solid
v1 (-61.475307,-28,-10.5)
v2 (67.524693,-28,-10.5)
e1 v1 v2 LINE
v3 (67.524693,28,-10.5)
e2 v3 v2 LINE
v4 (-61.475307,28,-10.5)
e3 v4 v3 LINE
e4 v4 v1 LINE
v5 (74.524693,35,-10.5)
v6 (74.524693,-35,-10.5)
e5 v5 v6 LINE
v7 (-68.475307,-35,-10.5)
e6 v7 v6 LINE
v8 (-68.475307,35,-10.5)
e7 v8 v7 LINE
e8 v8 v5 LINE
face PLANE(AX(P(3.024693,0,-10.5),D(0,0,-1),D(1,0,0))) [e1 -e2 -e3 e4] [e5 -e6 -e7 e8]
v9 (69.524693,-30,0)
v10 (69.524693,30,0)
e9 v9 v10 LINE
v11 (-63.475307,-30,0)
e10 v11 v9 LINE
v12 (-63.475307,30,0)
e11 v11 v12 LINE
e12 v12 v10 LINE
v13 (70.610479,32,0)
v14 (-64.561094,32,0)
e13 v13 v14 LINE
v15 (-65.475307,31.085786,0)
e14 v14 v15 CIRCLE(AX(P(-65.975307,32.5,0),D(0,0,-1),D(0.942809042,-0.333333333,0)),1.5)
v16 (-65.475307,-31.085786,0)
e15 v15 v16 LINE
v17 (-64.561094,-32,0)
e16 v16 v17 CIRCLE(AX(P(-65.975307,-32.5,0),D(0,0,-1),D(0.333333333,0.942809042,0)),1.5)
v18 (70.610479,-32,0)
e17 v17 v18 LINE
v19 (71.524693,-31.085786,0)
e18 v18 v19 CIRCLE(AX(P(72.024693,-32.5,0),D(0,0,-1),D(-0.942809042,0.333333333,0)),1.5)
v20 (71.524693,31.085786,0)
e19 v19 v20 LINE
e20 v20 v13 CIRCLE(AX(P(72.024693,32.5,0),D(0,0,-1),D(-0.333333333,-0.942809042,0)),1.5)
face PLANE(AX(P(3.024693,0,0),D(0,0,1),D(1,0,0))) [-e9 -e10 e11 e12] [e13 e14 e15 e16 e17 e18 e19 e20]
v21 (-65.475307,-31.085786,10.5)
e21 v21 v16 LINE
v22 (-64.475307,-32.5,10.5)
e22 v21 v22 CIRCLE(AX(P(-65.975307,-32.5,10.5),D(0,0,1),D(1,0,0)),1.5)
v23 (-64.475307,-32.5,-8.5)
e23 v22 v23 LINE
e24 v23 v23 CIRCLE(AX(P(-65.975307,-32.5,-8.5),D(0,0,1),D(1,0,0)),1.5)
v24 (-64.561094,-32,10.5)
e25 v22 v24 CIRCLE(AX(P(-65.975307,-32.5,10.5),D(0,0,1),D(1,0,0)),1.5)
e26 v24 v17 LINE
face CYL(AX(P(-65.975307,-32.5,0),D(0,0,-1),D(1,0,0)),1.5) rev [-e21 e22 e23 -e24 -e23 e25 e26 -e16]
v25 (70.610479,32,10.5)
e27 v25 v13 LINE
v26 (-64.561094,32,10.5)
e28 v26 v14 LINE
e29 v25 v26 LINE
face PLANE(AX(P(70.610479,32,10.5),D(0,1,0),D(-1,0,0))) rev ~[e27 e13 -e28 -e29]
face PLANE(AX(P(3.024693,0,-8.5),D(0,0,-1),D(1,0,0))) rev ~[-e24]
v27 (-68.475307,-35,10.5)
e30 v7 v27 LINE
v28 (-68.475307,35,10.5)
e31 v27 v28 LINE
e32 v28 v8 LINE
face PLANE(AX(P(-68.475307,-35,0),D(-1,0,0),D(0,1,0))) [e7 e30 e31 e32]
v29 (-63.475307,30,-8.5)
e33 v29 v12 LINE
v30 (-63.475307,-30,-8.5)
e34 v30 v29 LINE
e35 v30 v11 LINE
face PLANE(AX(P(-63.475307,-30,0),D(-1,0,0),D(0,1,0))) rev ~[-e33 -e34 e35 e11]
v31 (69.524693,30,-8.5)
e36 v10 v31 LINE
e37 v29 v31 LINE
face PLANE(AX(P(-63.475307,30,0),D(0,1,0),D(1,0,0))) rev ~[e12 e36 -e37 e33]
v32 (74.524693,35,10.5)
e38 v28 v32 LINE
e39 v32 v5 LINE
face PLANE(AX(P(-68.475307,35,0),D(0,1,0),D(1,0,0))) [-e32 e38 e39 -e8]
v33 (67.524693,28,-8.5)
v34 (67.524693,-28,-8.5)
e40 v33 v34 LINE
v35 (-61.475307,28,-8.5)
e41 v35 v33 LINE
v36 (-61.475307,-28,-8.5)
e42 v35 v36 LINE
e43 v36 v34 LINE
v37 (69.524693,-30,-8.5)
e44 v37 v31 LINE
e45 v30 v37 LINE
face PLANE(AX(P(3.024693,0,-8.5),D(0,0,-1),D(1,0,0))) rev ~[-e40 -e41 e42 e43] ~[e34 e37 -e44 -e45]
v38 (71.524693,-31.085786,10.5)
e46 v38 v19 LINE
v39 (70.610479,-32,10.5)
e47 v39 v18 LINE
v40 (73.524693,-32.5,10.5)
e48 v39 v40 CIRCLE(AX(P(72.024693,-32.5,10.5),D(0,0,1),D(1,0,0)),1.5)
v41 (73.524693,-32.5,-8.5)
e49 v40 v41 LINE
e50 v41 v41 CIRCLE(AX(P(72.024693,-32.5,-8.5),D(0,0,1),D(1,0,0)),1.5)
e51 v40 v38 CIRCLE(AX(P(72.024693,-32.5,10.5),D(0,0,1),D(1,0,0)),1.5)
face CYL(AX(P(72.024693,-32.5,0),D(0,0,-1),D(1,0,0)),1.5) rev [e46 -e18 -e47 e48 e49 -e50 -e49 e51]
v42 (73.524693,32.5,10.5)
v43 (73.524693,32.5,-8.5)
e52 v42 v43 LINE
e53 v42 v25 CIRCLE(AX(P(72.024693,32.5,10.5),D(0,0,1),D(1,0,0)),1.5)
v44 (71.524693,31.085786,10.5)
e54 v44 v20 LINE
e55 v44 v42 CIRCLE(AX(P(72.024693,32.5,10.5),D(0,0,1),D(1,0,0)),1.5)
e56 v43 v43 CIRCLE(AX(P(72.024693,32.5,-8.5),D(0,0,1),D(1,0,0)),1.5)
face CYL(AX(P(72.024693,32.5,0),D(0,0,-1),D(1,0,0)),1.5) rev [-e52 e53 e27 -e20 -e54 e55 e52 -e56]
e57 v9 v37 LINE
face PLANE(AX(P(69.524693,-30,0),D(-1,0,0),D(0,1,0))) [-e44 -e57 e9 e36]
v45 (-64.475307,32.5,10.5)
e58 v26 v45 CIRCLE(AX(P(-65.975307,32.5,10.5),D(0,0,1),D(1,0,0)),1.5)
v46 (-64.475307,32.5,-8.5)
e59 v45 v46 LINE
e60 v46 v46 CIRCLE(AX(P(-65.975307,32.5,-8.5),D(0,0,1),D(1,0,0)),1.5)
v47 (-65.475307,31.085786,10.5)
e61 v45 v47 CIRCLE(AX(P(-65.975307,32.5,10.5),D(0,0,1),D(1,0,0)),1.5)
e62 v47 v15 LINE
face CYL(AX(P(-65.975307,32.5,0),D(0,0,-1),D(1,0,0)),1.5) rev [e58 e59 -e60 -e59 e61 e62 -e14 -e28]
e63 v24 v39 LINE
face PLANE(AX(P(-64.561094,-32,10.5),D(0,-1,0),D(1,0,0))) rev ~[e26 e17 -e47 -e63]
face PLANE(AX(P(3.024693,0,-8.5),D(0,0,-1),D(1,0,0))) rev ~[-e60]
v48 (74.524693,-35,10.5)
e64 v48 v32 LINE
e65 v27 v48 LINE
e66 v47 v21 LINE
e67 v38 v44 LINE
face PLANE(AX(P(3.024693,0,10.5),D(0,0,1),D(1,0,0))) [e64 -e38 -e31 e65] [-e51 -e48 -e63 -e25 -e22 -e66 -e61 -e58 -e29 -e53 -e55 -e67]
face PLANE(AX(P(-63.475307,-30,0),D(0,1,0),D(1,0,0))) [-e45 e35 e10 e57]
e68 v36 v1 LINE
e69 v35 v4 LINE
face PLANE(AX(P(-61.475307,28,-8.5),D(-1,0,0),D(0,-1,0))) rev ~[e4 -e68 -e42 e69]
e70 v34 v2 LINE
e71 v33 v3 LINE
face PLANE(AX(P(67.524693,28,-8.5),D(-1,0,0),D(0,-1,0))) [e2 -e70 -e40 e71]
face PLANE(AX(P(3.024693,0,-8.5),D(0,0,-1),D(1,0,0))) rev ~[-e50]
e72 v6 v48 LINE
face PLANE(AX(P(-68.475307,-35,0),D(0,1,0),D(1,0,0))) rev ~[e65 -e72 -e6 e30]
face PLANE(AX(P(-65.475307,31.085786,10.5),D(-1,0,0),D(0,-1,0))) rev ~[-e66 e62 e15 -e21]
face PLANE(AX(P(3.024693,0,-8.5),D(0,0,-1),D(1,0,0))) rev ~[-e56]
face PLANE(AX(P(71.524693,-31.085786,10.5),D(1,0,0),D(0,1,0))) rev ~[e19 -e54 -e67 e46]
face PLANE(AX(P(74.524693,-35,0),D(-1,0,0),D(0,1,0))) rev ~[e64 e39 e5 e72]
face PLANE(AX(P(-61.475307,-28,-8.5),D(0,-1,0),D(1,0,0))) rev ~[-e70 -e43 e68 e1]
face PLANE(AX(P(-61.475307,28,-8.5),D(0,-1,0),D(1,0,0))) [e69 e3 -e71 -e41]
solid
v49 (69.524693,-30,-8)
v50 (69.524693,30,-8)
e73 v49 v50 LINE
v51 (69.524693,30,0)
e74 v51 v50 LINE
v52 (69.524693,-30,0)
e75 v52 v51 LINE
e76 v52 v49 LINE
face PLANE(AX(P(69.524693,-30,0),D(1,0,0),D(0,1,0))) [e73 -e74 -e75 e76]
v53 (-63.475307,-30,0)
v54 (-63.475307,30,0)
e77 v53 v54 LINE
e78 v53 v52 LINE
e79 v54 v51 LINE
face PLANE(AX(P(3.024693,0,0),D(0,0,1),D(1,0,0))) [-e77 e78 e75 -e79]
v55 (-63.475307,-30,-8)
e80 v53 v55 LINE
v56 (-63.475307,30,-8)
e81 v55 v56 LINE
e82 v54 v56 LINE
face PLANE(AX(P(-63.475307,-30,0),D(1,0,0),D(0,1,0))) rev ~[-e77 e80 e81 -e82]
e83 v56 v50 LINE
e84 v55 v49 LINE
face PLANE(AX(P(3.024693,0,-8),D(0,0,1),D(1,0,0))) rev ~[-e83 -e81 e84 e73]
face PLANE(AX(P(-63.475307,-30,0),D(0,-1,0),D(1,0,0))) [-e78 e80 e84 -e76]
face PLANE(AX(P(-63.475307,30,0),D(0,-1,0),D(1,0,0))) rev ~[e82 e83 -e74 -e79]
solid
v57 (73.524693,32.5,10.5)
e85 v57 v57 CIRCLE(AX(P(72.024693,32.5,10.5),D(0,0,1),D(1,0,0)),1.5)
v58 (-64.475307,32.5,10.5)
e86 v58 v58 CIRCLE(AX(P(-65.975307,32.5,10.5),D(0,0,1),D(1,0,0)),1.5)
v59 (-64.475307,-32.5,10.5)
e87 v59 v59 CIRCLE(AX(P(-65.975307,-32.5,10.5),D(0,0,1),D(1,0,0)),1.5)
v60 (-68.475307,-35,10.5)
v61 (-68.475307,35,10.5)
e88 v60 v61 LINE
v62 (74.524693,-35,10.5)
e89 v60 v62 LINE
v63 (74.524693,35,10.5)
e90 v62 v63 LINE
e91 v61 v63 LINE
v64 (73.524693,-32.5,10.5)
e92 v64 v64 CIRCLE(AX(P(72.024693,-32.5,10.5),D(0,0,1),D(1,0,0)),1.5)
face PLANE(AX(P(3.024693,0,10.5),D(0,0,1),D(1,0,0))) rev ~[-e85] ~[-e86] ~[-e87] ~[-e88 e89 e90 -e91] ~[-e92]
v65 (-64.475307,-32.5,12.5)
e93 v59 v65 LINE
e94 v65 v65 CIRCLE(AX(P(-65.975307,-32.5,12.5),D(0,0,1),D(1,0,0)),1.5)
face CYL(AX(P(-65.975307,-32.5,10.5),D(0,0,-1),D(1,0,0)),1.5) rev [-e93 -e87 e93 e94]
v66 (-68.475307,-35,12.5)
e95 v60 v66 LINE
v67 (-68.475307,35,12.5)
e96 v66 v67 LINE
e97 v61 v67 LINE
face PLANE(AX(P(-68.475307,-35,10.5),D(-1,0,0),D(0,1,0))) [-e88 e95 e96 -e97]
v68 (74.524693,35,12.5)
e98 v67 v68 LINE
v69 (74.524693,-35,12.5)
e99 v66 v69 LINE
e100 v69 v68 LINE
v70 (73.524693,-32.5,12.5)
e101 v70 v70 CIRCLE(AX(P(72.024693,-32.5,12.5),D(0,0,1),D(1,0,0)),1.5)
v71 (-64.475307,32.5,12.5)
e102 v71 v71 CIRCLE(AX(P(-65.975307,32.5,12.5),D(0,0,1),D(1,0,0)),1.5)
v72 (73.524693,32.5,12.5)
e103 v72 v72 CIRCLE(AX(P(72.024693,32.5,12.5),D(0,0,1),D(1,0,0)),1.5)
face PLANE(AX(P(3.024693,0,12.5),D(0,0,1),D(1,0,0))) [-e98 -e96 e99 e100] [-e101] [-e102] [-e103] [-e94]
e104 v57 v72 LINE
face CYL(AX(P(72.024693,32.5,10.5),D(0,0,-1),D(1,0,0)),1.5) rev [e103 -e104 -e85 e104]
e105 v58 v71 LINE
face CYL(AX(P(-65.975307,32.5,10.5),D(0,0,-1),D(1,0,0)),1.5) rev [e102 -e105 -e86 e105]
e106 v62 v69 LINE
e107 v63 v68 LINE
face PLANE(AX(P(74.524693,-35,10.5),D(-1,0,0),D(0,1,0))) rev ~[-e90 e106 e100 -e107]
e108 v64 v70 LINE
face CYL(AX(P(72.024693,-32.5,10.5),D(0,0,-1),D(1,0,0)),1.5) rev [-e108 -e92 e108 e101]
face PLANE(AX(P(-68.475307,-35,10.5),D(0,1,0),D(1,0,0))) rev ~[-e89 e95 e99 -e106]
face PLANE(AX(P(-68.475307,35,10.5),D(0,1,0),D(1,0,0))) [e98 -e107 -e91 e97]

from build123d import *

# Parameters (mm, degrees)
F0_W     = 133
F0_H     = 60
F1_DEPTH = 8
F0_W_2   = 143
F0_H_2   = 70
F0_R     = 1.5
F2_DEPTH = 8.5
F3_W     = 143
F3_H     = 70
F3_W_2   = 129
F3_H_2   = 56
F4_DEPTH = 2
F5_DEPTH = 10.5
F6_W     = 133
F6_H     = 60
F7_DEPTH = 10.5
F8_W     = 143
F8_H     = 70
F8_R     = 1.5
F9_DEPTH = 2


# Not quite as in the source:
# - a feature names something its author has since deleted; it is built from what else it names


with BuildPart() as f1:
    # F0 (on Top) → F1 (new body)
    with BuildSketch(Plane.XY):
        with Locations((3.0246927018, 0)):
            Rectangle(F0_W, F0_H)
    extrude(amount=-F1_DEPTH)


with BuildPart() as f2:
    # F0 (on Top) → F2 (new body)
    with BuildSketch(Plane.XY):
        with Locations((3.0246927018, 0)):
            Rectangle(F0_W_2, F0_H_2)
        with Locations((-65.9753072982, -32.5)):
            Circle(F0_R, mode=Mode.SUBTRACT)
        with Locations((72.0246927018, -32.5)):
            Circle(F0_R, mode=Mode.SUBTRACT)
        with Locations((-65.9753072982, 32.5)):
            Circle(F0_R, mode=Mode.SUBTRACT)
        with Locations((3.0246927018, 0)):
            Rectangle(F0_W, F0_H, mode=Mode.SUBTRACT)
        with Locations((72.0246927018, 32.5)):
            Circle(F0_R, mode=Mode.SUBTRACT)
    extrude(amount=-F2_DEPTH)

    # F3 (on face) → F4 (join)
    with BuildSketch(Plane(origin=(0, 0, -8.5), x_dir=(1, 0, 0), z_dir=(0, 0, -1))):
        with Locations((3.0246927018, 0)):
            Rectangle(F3_W, F3_H)
        with Locations((3.0246927018, 0)):
            Rectangle(F3_W_2, F3_H_2, mode=Mode.SUBTRACT)
    extrude(amount=F4_DEPTH)

    # F0 (on Top) → F5 (join)
    with BuildSketch(Plane.XY):
        with Locations((3.0246927018, 0)):
            Rectangle(F0_W_2, F0_H_2)
        with Locations((-65.9753072982, -32.5)):
            Circle(F0_R, mode=Mode.SUBTRACT)
        with Locations((72.0246927018, -32.5)):
            Circle(F0_R, mode=Mode.SUBTRACT)
        with Locations((-65.9753072982, 32.5)):
            Circle(F0_R, mode=Mode.SUBTRACT)
        with Locations((3.0246927018, 0)):
            Rectangle(F0_W, F0_H, mode=Mode.SUBTRACT)
        with Locations((72.0246927018, 32.5)):
            Circle(F0_R, mode=Mode.SUBTRACT)
    extrude(amount=F5_DEPTH)

    # F6 (on face) → F7 (cut)
    with BuildSketch(Plane.XY.offset(10.5)):
        with BuildLine():
            ThreePointArc((-64.5610937358, 32), (-64.9146471264, 31.4393398282), (-65.4753072982, 31.0857864376))
            Line((-65.4753072982, 31.0857864376), (-65.4753072982, -31.0857864376))
            ThreePointArc((-65.4753072982, -31.0857864376), (-64.9146471264, -31.4393398282), (-64.5610937358, -32))
            Line((-64.5610937358, -32), (70.6104791395, -32))
            ThreePointArc((70.6104791395, -32), (70.9640325301, -31.4393398282), (71.5246927018, -31.0857864376))
            Line((71.5246927018, -31.0857864376), (71.5246927018, 31.0857864376))
            ThreePointArc((71.5246927018, 31.0857864376), (70.9640325301, 31.4393398282), (70.6104791395, 32))
            Line((70.6104791395, 32), (-64.5610937358, 32))
        make_face()
        with Locations((3.0246927018, 0)):
            Rectangle(F6_W, F6_H, mode=Mode.SUBTRACT)
    extrude(amount=-F7_DEPTH, mode=Mode.SUBTRACT)


with BuildPart() as f9:
    # F8 (on face) → F9 (new body)
    with BuildSketch(Plane.XY.offset(10.5)):
        with Locations((3.0246927018, 0)):
            Rectangle(F8_W, F8_H)
        with Locations((-65.9753072982, -32.5)):
            Circle(F8_R, mode=Mode.SUBTRACT)
        with Locations((72.0246927018, -32.5)):
            Circle(F8_R, mode=Mode.SUBTRACT)
        with Locations((-65.9753072982, 32.5)):
            Circle(F8_R, mode=Mode.SUBTRACT)
        with Locations((72.0246927018, 32.5)):
            Circle(F8_R, mode=Mode.SUBTRACT)
    extrude(amount=F9_DEPTH)


solid = Compound([f1.part, f2.part, f9.part])
